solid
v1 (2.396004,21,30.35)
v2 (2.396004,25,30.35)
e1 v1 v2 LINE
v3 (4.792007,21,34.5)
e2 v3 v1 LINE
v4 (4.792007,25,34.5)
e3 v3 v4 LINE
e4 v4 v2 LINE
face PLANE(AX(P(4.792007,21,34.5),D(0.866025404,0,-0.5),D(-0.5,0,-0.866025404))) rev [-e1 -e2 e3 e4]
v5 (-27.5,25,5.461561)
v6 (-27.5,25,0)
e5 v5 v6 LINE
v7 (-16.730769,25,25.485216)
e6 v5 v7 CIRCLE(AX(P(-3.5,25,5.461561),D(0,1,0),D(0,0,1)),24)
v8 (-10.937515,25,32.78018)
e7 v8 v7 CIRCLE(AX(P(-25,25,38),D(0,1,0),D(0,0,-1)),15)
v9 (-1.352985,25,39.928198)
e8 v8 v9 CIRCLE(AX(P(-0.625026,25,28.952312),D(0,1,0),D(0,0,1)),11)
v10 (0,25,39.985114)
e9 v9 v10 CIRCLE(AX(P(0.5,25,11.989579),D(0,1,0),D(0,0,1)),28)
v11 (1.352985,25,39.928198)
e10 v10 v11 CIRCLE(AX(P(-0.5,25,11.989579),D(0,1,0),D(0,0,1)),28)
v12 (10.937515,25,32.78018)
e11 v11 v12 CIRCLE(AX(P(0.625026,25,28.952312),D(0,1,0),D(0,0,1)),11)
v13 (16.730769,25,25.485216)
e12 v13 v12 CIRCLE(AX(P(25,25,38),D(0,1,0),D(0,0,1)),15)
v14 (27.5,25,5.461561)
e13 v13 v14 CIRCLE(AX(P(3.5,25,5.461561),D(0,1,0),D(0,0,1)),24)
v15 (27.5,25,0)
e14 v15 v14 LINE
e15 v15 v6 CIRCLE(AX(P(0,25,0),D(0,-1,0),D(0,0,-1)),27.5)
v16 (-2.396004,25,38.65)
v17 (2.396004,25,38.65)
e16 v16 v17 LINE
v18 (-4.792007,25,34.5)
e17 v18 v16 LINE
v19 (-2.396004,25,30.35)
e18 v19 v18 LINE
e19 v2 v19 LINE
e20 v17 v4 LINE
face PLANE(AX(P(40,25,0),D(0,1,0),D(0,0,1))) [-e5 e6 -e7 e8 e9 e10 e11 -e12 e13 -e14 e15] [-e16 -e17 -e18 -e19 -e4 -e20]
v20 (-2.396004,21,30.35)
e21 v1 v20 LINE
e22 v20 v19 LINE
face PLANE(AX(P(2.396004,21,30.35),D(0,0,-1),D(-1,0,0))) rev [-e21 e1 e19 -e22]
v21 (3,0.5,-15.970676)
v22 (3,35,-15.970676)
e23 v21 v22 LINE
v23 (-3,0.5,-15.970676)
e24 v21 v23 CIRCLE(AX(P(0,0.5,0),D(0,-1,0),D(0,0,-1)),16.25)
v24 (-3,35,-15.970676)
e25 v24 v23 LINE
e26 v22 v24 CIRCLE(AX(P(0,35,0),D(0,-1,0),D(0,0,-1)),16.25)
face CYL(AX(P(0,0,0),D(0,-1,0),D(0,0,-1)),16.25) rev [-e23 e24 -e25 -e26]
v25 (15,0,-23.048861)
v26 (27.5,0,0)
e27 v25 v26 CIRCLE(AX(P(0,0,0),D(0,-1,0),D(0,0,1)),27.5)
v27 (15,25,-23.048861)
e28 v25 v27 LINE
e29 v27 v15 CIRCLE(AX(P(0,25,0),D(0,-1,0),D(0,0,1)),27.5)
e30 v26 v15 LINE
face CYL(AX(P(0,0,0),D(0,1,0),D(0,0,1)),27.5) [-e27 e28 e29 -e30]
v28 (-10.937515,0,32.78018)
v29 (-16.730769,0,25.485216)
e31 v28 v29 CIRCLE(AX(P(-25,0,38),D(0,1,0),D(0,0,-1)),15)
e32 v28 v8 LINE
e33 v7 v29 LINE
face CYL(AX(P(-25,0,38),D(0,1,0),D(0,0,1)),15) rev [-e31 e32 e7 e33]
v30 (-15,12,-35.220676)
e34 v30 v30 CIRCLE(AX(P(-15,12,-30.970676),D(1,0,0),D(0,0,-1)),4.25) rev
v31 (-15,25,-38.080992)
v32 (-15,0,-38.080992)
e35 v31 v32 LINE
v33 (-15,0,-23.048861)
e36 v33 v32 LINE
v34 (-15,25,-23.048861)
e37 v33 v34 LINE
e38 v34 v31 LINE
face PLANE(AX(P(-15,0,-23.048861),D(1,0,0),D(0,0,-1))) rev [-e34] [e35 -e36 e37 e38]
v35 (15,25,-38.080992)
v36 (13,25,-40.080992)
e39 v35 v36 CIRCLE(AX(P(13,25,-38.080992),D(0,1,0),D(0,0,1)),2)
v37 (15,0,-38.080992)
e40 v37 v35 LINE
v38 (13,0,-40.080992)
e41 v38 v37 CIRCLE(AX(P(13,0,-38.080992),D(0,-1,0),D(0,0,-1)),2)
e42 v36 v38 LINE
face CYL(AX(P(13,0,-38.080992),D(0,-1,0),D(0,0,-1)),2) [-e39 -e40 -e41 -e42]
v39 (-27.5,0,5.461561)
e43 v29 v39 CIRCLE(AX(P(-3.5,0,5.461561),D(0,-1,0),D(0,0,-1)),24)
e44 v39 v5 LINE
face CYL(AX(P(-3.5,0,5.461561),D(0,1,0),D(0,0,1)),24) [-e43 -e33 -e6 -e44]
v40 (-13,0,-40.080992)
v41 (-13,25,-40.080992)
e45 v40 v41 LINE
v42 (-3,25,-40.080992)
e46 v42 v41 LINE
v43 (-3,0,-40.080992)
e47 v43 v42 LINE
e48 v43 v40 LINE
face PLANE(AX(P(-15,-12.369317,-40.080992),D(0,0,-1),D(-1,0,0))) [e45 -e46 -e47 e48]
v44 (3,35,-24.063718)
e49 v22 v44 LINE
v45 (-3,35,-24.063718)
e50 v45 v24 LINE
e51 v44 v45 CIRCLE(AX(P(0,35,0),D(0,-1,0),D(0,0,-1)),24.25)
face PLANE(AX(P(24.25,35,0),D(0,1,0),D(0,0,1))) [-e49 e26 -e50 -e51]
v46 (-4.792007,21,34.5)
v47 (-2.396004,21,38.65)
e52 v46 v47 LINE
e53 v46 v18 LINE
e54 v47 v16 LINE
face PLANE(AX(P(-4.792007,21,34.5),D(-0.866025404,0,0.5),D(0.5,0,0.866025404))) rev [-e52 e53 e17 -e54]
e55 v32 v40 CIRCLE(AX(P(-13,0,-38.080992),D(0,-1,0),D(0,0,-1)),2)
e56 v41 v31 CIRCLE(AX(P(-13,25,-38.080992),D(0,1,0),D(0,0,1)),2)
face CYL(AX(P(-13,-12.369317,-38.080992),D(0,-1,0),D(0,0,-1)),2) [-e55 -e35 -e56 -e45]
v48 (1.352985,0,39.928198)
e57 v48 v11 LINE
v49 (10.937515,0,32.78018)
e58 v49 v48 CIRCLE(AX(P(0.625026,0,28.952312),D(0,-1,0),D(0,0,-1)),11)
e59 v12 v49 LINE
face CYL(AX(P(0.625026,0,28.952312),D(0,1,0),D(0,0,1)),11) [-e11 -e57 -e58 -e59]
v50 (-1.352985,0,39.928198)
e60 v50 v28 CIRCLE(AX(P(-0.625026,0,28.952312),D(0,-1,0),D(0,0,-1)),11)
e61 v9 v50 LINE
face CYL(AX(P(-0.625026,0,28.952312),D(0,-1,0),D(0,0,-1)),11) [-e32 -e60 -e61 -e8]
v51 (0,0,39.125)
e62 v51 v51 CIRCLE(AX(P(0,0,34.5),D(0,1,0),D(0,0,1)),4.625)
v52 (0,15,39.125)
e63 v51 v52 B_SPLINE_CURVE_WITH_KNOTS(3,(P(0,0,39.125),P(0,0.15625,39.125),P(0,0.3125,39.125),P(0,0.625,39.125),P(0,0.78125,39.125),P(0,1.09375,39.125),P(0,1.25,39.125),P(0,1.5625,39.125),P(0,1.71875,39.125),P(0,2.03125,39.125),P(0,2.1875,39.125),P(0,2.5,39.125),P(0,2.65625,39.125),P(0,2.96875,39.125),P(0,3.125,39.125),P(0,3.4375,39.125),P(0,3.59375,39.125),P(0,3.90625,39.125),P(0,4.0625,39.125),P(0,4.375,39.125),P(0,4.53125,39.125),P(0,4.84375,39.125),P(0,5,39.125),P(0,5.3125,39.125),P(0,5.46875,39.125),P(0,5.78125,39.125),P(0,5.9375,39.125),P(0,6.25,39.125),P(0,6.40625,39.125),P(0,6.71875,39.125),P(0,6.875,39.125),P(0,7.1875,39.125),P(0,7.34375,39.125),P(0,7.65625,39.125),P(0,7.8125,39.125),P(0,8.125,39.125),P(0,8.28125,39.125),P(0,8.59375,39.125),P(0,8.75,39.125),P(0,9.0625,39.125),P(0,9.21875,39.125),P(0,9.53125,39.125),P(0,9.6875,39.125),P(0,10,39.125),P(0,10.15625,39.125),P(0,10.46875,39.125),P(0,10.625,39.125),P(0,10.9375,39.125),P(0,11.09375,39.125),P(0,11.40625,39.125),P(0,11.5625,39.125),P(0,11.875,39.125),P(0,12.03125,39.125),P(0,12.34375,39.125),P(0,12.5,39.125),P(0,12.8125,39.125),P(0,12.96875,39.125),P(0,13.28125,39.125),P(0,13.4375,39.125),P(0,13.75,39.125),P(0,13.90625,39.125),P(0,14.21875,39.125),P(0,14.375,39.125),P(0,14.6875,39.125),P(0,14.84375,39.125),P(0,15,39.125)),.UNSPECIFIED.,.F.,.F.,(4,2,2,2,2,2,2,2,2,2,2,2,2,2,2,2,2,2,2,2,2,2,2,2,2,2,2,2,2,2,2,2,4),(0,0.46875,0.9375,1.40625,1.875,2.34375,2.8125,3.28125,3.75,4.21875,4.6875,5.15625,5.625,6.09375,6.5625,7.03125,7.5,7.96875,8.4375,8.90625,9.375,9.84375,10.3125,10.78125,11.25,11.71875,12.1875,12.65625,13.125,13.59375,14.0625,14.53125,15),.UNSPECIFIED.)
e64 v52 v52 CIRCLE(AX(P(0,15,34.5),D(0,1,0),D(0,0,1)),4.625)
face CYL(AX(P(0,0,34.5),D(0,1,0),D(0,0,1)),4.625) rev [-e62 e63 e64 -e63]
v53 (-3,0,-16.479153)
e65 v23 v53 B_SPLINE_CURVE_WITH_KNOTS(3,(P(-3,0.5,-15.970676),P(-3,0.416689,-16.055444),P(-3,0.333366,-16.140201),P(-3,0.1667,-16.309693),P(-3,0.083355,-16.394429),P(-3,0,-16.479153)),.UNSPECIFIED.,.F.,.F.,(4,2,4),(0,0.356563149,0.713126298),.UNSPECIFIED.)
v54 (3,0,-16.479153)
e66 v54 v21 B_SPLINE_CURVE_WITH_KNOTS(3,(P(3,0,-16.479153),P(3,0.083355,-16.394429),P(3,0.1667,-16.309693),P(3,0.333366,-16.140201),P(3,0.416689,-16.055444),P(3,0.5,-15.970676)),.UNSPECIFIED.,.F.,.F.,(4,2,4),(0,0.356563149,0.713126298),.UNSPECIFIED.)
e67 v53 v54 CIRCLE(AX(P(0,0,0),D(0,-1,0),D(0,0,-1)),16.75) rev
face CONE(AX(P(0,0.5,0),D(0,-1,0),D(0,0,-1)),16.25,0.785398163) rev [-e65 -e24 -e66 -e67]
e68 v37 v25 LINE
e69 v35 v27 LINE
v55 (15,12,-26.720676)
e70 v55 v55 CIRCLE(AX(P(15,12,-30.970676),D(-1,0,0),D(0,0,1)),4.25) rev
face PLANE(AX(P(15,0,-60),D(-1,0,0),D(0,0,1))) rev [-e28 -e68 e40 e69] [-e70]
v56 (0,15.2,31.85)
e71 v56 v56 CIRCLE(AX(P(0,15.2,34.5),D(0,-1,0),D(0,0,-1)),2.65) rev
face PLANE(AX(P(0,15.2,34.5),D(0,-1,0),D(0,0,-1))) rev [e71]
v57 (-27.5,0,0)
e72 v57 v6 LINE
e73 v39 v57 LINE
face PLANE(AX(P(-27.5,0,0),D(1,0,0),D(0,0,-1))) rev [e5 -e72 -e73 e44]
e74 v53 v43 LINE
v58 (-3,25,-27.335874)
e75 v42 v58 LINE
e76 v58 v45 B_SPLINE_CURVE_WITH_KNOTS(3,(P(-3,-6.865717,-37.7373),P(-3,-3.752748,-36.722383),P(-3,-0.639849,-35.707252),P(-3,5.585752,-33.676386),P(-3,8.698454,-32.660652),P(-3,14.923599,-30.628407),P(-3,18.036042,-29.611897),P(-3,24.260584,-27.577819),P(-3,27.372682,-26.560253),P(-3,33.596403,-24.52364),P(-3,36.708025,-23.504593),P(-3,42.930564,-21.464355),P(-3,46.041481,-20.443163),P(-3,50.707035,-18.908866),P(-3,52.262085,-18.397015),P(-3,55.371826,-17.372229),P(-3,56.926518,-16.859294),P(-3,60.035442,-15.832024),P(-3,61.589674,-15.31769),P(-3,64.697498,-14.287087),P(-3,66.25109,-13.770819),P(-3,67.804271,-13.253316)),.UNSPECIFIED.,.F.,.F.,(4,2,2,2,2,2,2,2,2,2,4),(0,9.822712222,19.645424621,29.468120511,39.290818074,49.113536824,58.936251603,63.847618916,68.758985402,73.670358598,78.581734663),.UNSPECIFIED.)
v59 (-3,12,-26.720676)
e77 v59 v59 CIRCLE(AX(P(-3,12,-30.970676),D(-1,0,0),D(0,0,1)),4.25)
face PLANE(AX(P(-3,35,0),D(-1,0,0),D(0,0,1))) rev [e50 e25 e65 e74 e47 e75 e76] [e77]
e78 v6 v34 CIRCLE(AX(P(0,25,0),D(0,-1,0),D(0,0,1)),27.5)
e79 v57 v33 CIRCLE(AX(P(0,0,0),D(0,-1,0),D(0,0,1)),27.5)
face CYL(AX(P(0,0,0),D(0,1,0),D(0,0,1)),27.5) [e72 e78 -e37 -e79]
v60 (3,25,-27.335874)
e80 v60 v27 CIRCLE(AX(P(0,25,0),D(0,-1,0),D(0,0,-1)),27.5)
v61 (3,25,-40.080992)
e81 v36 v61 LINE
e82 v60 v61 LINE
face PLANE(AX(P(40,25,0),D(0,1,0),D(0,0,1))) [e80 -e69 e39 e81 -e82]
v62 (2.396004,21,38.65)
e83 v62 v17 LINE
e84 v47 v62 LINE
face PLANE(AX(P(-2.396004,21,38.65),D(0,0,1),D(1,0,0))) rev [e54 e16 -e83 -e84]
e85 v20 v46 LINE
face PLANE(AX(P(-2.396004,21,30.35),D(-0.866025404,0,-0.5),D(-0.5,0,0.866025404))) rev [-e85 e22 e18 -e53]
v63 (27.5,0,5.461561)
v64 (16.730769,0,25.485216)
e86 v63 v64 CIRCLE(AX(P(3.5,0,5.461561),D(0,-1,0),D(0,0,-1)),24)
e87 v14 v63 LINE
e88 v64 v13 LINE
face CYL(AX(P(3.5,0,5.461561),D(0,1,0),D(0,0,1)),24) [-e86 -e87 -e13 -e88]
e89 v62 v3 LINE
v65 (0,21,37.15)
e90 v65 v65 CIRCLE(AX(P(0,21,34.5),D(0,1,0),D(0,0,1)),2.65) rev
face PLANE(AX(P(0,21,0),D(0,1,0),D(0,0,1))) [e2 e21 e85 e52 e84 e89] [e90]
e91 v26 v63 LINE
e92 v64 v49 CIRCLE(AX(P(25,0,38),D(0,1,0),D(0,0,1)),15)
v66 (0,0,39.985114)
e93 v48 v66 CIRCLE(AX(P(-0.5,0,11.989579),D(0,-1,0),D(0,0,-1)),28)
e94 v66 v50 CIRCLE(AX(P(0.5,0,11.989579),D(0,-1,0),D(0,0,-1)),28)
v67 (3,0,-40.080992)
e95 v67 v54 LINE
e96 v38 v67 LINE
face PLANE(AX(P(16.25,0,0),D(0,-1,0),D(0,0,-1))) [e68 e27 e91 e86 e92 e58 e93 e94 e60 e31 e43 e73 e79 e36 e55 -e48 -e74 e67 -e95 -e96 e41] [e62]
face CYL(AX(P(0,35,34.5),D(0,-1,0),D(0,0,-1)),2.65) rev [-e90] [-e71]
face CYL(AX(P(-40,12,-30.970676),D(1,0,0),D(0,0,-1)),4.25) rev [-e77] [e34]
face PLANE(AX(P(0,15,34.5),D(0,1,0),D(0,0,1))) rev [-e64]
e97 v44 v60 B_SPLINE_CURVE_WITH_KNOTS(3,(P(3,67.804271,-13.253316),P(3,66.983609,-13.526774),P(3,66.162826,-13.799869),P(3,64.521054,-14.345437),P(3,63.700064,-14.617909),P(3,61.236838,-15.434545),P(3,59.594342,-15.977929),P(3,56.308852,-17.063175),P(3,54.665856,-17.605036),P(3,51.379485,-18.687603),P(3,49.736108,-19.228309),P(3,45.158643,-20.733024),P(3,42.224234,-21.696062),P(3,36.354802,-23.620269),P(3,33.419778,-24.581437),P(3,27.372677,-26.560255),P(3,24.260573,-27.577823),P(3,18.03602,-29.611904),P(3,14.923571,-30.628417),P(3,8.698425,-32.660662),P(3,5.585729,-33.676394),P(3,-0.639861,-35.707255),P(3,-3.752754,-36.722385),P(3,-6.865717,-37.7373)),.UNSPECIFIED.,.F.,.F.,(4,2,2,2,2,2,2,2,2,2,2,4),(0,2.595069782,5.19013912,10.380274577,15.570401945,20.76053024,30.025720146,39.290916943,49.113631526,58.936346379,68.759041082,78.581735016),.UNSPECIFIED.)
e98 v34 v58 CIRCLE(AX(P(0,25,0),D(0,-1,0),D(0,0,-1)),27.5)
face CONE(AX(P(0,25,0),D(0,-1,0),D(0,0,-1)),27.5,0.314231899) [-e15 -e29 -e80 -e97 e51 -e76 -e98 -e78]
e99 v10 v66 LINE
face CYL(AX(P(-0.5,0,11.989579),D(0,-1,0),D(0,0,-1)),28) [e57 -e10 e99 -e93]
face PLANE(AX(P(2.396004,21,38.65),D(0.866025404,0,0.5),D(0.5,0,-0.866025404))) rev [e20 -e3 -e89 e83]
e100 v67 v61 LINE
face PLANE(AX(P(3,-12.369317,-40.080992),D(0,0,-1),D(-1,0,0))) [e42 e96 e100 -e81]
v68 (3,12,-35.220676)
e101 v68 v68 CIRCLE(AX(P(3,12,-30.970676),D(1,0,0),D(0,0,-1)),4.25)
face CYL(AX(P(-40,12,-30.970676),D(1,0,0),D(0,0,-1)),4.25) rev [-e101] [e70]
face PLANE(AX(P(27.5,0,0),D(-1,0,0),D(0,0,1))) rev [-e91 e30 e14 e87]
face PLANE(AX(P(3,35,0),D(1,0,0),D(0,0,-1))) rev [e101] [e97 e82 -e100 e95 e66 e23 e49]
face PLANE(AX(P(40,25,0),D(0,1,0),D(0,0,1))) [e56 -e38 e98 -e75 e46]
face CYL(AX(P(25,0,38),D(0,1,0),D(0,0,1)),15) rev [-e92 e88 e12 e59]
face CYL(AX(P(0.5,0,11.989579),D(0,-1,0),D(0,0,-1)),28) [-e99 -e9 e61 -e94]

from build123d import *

# Parameters (mm, degrees)
SKETCH2_W               = 6
SKETCH2_H               = 60
CUT_EXTRUDE1_DEPTH      = 67.520673478
CUT_EXTRUDE2_DEPTH      = 69.366658541
CUT_EXTRUDE2_DEPTH_BACK = 69.366658541
SKETCH3_R               = 4.25
SKETCH6_R               = 2.65
CUT_EXTRUDE5_DEPTH      = 67.520673599
CUT_EXTRUDE6_DEPTH      = 4
CUT_EXTRUDE7_DEPTH      = 62.846584554
FILLET1_R               = 28
SKETCH12_W              = 12
SKETCH12_H              = 3
BOSS_EXTRUDE1_DEPTH     = 25
CHAMFER1_SIZE           = 0.5
FILLET2_R               = 2
SKETCH13_R              = 4.625
CUT_EXTRUDE8_DEPTH      = 53.561734699
SKETCH15_R              = 2.65
BOSS_EXTRUDE2_DEPTH     = 0.2
SKETCH16_R              = 15
CUT_EXTRUDE9_DEPTH      = 55.660186193
FILLET3_R               = 11
FILLET4_R               = 24


with BuildPart() as part:
    # Sketch1 → Revolve1 (revolve)
    with BuildSketch(Plane.XY, mode=Mode.PRIVATE) as revolve1_sk:
        Polygon((16.25, 0), (40, 0), (40, 25), (27.5, 25), (24.25, 35), (16.25, 35), align=None)
    revolve(revolve1_sk.sketch.rotate(Axis((0, 0, 0), (0, 1, 0)), 90), axis=Axis((0, 0, 0), (0, 1, 0)))

    # Sketch2 → Cut-Extrude1 (cut, through all)
    with BuildSketch(Plane.XZ):
        with Locations((0, -30)):
            Rectangle(SKETCH2_W, SKETCH2_H)
    extrude(amount=-CUT_EXTRUDE1_DEPTH, mode=Mode.SUBTRACT)

    # Sketch3 → Cut-Extrude2 (cut, two sides: drawn at the far end of the back side and taken through both)
    with BuildSketch(Plane(origin=(-3, 0, 0), x_dir=(0, 0, -1), z_dir=(1, 0, 0)).offset(-CUT_EXTRUDE2_DEPTH_BACK)):
        with Locations((30.970676254, 12)):
            Circle(SKETCH3_R)
    extrude(amount=CUT_EXTRUDE2_DEPTH + CUT_EXTRUDE2_DEPTH_BACK, mode=Mode.SUBTRACT)

    # Sketch6 → Cut-Extrude5 (cut, through all)
    with BuildSketch(Plane.XZ):
        with Locations(Location((0, 34.5, 0), (0, 0, 270))):
            Circle(SKETCH6_R)
    extrude(amount=-CUT_EXTRUDE5_DEPTH, mode=Mode.SUBTRACT)

    # Sketch7 → Cut-Extrude6 (cut)
    with BuildSketch(Plane(origin=(0, 25, 0), x_dir=(1, 0, 0), z_dir=(0, 1, 0))):
        Polygon((-2.396003617, -30.35), (-4.792007234, -34.5), (-2.396003617, -38.65), (2.396003617, -38.65), (4.792007234, -34.5), (2.396003617, -30.35), align=None)
    extrude(amount=-CUT_EXTRUDE6_DEPTH, mode=Mode.SUBTRACT)

    # Sketch8 → Cut-Extrude7 (cut, through all)
    with BuildSketch(Plane(origin=(0, 25, 0), x_dir=(1, 0, 0), z_dir=(0, 1, 0))):
        with BuildLine():
            Line((-27.5, 0), (-27.5, -50))
            Line((-27.5, -50), (-50, -50))
            Line((-50, -50), (-50, 70))
            Line((-50, 70), (50, 70))
            Line((50, 70), (50, -50))
            Line((50, -50), (27.5, -50))
            Line((27.5, -50), (27.5, 0))
            ThreePointArc((27.5, 0), (24.173849507, 13.110110602), (15, 23.048861143))
            Line((15, 23.048861143), (15, 60))
            Line((15, 60), (-15, 60))
            Line((-15, 60), (-15, 23.048861143))
            ThreePointArc((-15, 23.048861143), (-24.173849507, 13.110110602), (-27.5, 0))
        make_face()
    extrude(amount=-CUT_EXTRUDE7_DEPTH, mode=Mode.SUBTRACT)

    # Fillet1
    # the kernel refuses this fillet: 28 mm, written as the material it takes off along each edge
    with BuildSketch(Plane(origin=(27.5, -77.857831737, 29.047375097), x_dir=(-0.9365360560407987, 0, 0.3505712705507198), z_dir=(0, 1, 0))) as fillet1_piece_1:
        with BuildLine():
            CenterArc((20.243036252, -25.791236836), FILLET1_R, 67.089723989, 92.388015463)
            Line((-5.979973318, -15.975241261), (0, 0))
            ThreePointArc((0, 0), (15.571566347, 3.155375949), (31.143132695, 0))
        make_face()
    extrude(amount=180.715663474, mode=Mode.SUBTRACT)
    with BuildSketch(Plane(origin=(-27.5, -77.857831737, 29.047375097), x_dir=(0, 0, -1), z_dir=(0, 1, 0))) as fillet1_piece_2:
        with BuildLine():
            CenterArc((17.057796288, -28), FILLET1_R, 90, 92.388015463)
            ThreePointArc((-10.917887598, -29.166666667), (-8.414067145, -13.477149178), (0, 0))
            Line((0, 0), (17.057796288, 0))
        make_face()
    extrude(amount=180.715663474, mode=Mode.SUBTRACT)

    # Sketch12 → Boss-Extrude1 (add)
    with BuildSketch(Plane(origin=(0, 25, 0), x_dir=(1, 0, 0), z_dir=(0, 1, 0))):
        with Locations((-9, 38.580992435)):
            Rectangle(SKETCH12_W, SKETCH12_H)
        with Locations((9, 38.580992435)):
            Rectangle(SKETCH12_W, SKETCH12_H)
    extrude(amount=-BOSS_EXTRUDE1_DEPTH)

    # Chamfer1
    chamfer1_edges = [part.edges().sort_by_distance(p)[0] for p in [
        (0, 0, 16.25),
    ]]
    chamfer(chamfer1_edges, length=CHAMFER1_SIZE)

    # Fillet2
    fillet2_edges = [part.edges().sort_by_distance(p)[0] for p in [
        (-15, 12.5, -40.080992435),
        (15, 12.5, -40.080992435),
    ]]
    fillet(fillet2_edges, radius=FILLET2_R)

    # Sketch13 → Cut-Extrude8 (cut, through all)
    with BuildSketch(Plane(origin=(0, 15, 0), x_dir=(1, 0, 0), z_dir=(0, 1, 0))):
        with Locations(Location((0, -34.5, 0), (0, 0, 270))):
            Circle(SKETCH13_R)
    extrude(amount=-CUT_EXTRUDE8_DEPTH, mode=Mode.SUBTRACT)

    # Sketch15 → Boss-Extrude2 (add)
    with BuildSketch(Plane.XZ.offset(-15)):
        with Locations(Location((0, 34.5, 0), (0, 0, 270))):
            Circle(SKETCH15_R)
    extrude(amount=-BOSS_EXTRUDE2_DEPTH)

    # Sketch16 → Cut-Extrude9 (cut, through all)
    with BuildSketch(Plane(origin=(0, 25, 0), x_dir=(1, 0, 0), z_dir=(0, 1, 0))):
        with Locations((25, -38)):
            Circle(SKETCH16_R)
        with Locations((-25, -38)):
            Circle(SKETCH16_R)
    extrude(amount=-CUT_EXTRUDE9_DEPTH, mode=Mode.SUBTRACT)

    # Fillet3
    fillet3_edges = [part.edges().sort_by_distance(p)[0] for p in [
        (10.000096358, 12.5, 37.946234534),
        (-10.000096358, 12.5, 37.946234534),
    ]]
    fillet(fillet3_edges, radius=FILLET3_R)

    # Fillet4
    fillet4_edges = [part.edges().sort_by_distance(p)[0] for p in [
        (-25.243486575, 12.5, 23.001976321),
        (25.243486575, 12.5, 23.001976321),
    ]]
    fillet(fillet4_edges, radius=FILLET4_R)


solid = part.part
